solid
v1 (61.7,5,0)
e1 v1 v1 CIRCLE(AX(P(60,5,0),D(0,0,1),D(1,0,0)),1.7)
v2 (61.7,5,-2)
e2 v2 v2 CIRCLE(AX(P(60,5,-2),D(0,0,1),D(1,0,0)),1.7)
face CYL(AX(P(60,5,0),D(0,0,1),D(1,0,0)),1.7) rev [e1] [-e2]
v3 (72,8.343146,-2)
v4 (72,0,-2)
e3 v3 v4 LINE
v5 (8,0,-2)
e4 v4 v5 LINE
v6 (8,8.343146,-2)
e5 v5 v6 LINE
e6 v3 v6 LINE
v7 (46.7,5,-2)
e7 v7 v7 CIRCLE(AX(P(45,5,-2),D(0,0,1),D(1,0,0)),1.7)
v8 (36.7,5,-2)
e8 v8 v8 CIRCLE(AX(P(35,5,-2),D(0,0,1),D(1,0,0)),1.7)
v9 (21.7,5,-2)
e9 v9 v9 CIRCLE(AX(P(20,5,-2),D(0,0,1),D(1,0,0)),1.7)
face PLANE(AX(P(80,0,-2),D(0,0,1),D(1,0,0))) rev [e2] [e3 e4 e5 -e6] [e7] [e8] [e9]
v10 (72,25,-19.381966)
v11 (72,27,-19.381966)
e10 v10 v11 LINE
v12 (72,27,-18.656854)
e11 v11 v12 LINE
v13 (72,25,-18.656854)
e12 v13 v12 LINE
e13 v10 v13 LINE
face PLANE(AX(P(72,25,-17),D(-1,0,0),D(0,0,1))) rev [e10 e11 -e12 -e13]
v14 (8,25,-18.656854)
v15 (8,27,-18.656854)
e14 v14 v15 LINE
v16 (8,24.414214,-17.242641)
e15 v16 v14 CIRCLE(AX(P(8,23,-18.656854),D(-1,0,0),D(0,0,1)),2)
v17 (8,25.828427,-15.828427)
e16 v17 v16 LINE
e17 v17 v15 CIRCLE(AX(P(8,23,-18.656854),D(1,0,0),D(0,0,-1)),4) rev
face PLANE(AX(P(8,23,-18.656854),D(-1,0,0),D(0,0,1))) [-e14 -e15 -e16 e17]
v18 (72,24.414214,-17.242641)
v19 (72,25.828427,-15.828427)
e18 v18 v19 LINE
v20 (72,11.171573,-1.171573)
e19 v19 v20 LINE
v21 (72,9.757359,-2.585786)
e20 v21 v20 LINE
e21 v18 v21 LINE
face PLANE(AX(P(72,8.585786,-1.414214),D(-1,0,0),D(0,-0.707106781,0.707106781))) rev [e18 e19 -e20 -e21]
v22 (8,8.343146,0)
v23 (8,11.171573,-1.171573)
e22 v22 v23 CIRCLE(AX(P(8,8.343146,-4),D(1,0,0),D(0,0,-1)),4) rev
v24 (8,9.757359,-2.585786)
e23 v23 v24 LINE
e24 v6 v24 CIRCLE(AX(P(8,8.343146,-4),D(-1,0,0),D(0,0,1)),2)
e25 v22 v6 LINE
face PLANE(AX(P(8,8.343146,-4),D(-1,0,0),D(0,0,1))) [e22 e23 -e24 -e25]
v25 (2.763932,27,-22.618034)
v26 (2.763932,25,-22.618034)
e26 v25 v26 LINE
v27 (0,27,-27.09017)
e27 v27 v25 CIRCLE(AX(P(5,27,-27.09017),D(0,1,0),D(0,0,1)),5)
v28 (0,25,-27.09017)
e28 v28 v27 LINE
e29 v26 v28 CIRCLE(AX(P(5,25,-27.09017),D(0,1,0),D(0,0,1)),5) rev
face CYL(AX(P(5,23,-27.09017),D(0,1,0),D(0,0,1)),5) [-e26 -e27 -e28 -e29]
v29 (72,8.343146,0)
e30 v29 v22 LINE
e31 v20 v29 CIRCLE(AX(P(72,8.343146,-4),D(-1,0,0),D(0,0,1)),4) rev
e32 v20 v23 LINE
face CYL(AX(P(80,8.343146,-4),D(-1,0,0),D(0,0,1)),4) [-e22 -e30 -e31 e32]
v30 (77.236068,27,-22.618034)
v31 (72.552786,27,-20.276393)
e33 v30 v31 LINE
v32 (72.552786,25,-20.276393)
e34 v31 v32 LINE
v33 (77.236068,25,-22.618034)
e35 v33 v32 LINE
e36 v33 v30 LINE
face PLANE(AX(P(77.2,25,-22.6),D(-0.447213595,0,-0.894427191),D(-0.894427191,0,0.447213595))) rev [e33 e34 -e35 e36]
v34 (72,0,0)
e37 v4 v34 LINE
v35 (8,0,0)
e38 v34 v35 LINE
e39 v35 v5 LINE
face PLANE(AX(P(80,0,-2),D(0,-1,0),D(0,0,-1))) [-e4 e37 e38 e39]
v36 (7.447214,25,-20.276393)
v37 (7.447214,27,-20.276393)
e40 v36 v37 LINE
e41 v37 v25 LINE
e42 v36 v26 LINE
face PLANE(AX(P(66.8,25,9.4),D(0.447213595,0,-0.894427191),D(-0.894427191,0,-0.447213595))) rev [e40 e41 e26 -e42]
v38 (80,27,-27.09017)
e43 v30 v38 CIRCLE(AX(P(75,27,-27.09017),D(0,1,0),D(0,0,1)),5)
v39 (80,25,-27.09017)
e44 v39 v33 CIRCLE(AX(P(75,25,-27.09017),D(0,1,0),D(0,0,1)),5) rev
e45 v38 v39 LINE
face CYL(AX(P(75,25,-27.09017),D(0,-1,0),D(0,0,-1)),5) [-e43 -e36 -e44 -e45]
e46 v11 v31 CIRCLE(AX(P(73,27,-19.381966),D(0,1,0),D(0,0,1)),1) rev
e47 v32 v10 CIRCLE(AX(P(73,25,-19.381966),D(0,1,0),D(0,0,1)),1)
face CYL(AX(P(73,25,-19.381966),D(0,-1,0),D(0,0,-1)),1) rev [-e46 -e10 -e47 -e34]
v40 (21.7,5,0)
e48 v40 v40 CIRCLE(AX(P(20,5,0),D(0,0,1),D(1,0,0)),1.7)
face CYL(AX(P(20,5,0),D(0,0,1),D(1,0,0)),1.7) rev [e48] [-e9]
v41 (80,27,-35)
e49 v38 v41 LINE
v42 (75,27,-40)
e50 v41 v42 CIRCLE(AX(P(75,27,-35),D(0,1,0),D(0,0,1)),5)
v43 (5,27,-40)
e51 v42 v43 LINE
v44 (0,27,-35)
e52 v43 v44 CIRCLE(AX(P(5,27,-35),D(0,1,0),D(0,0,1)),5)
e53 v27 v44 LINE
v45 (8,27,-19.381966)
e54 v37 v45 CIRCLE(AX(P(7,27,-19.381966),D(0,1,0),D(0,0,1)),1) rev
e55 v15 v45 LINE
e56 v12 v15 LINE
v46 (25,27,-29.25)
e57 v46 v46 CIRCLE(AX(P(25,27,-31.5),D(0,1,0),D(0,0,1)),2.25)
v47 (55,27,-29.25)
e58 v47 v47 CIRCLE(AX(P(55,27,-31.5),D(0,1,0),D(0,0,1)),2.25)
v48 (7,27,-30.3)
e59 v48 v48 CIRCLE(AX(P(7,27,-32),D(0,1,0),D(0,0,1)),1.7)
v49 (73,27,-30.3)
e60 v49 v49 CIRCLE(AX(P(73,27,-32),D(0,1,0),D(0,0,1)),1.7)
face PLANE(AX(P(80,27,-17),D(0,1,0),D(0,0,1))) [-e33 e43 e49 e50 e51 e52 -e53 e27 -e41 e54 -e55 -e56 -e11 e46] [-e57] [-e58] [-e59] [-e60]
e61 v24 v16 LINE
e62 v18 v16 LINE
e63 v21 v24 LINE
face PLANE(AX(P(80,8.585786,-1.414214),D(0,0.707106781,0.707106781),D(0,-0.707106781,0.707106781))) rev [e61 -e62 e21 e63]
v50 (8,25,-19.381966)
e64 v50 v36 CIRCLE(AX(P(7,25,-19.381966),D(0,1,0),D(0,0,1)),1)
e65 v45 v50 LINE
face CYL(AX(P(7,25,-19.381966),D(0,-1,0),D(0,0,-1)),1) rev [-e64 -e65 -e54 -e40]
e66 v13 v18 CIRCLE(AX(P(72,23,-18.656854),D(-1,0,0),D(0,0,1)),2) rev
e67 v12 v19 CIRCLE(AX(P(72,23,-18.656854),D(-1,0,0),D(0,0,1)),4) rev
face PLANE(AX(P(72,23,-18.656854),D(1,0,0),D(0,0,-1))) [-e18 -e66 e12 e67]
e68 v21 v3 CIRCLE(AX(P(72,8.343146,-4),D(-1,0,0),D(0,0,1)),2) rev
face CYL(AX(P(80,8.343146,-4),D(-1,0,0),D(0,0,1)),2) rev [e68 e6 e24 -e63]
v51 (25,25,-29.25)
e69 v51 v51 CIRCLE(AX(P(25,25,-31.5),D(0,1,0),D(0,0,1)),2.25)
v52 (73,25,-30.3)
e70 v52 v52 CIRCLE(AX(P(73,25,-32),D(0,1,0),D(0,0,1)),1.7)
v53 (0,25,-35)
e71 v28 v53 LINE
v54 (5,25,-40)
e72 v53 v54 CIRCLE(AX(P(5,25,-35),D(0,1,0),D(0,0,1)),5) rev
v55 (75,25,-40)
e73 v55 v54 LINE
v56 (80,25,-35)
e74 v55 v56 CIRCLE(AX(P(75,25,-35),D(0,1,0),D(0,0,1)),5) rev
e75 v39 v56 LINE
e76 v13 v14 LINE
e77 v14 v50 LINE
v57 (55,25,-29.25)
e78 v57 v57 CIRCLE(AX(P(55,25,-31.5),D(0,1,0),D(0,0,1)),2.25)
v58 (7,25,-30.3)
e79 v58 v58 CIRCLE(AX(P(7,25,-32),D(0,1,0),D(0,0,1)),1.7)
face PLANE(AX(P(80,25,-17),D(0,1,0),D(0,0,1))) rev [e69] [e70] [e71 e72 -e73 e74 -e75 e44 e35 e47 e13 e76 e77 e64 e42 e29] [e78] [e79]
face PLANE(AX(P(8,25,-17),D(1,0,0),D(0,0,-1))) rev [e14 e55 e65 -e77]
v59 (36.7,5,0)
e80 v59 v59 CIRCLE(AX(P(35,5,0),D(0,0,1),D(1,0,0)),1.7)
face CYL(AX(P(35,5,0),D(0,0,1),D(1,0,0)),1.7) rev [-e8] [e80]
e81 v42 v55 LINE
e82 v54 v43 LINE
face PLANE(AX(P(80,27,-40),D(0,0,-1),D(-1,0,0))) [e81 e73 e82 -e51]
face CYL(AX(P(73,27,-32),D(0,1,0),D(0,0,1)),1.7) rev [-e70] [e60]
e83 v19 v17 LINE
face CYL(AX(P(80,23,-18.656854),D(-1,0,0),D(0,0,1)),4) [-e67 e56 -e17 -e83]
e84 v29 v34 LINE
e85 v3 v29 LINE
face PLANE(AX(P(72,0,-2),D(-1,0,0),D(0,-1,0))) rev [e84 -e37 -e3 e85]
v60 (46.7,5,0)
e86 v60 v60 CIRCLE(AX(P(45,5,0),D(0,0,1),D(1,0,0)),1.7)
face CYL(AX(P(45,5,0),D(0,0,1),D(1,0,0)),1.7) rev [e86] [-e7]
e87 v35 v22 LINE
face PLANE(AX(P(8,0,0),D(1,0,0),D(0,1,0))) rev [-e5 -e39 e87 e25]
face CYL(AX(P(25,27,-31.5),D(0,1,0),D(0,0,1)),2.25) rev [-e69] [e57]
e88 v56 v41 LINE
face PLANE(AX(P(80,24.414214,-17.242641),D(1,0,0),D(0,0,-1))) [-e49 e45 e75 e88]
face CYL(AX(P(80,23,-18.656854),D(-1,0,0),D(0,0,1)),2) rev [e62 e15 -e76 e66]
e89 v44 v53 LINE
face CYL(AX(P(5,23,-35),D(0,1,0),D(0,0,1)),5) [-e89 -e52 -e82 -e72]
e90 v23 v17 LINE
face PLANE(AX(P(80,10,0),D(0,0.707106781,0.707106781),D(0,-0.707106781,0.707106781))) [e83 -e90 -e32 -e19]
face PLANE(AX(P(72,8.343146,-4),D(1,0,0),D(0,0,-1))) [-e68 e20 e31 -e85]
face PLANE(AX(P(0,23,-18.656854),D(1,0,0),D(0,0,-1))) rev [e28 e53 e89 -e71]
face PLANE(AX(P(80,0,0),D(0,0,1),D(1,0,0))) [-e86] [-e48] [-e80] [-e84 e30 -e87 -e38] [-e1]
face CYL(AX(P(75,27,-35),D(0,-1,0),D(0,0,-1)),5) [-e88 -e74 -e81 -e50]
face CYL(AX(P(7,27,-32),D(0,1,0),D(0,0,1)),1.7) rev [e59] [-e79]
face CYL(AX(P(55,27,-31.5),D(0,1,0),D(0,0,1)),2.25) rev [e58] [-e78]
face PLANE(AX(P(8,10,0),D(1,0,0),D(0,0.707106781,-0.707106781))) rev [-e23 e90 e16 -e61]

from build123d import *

# Parameters (mm, degrees)
BASE_FLANGE1_DEPTH       = 80
CUT_EXTRUDE1_DEPTH       = 94.429117517
M3_CLEARANCE_HOLE1_D     = 3.4
M3_CLEARANCE_HOLE1_DEPTH = 2
M3_CLEARANCE_HOLE1_TIP   = 1.021463052
M4_CLEARANCE_HOLE1_D     = 4.5
M4_CLEARANCE_HOLE1_DEPTH = 2
M4_CLEARANCE_HOLE1_TIP   = 1.351936393
M3_CLEARANCE_HOLE2_D     = 3.4
M3_CLEARANCE_HOLE2_DEPTH = 2
M3_CLEARANCE_HOLE2_TIP   = 1.021463052
FILLET1_R                = 5
FILLET2_R                = 1


# Sheet-metal steps are written as plain solids
with BuildPart() as part:
    # Sketch1 → Base-Flange1 (new body)
    with BuildSketch(Plane(origin=(0, 0, 0), x_dir=(0, 0, -1), z_dir=(1, 0, 0))):
        with BuildLine():
            Line((0, 0), (0, 8.343145751))
            ThreePointArc((0, 8.343145751), (0.30448187, 9.87387948), (1.171572875, 11.171572875))
            Line((1.171572875, 11.171572875), (15.828427125, 25.828427125))
            ThreePointArc((15.828427125, 25.828427125), (17.12612052, 26.69551813), (18.656854249, 27))
            Line((18.656854249, 27), (40, 27))
            Line((40, 27), (40, 25))
            Line((40, 25), (18.656854249, 25))
            ThreePointArc((18.656854249, 25), (17.891487385, 24.847759065), (17.242640687, 24.414213562))
            Line((17.242640687, 24.414213562), (2.585786438, 9.757359313))
            ThreePointArc((2.585786438, 9.757359313), (2.152240935, 9.108512615), (2, 8.343145751))
            Line((2, 8.343145751), (2, 0))
            Line((2, 0), (0, 0))
        make_face()
    extrude(amount=BASE_FLANGE1_DEPTH)

    # Sketch2 → Cut-Extrude1 (cut, through all)
    with BuildSketch(Plane(origin=(0, 27, 0), x_dir=(1, 0, 0), z_dir=(0, 1, 0))):
        Polygon((0, 24), (8, 20), (8, 0), (0, 0), align=None)
        Polygon((80, 0), (80, 24), (72, 20), (72, 0), align=None)
    extrude(amount=-CUT_EXTRUDE1_DEPTH, mode=Mode.SUBTRACT)

    # M3 Clearance Hole1
    with Locations(Plane.XY):
        with Locations((20, 5), (35, 5), (45, 5), (60, 5)):
            Hole(M3_CLEARANCE_HOLE1_D / 2, depth=M3_CLEARANCE_HOLE1_DEPTH)
            with Locations((0, 0, -(M3_CLEARANCE_HOLE1_DEPTH + M3_CLEARANCE_HOLE1_TIP / 2))):  # 118° drill point
                Cone(0, M3_CLEARANCE_HOLE1_D / 2, M3_CLEARANCE_HOLE1_TIP, mode=Mode.SUBTRACT)

    # M4 Clearance Hole1
    with Locations(Plane(origin=(0, 27, 0), x_dir=(1, 0, 0), z_dir=(0, 1, 0))):
        with Locations((25, 31.5), (55, 31.5)):
            Hole(M4_CLEARANCE_HOLE1_D / 2, depth=M4_CLEARANCE_HOLE1_DEPTH)
            with Locations((0, 0, -(M4_CLEARANCE_HOLE1_DEPTH + M4_CLEARANCE_HOLE1_TIP / 2))):  # 118° drill point
                Cone(0, M4_CLEARANCE_HOLE1_D / 2, M4_CLEARANCE_HOLE1_TIP, mode=Mode.SUBTRACT)

    # M3 Clearance Hole2
    with Locations(Plane(origin=(0, 27, 0), x_dir=(1, 0, 0), z_dir=(0, 1, 0))):
        with Locations((7, 32), (73, 32)):
            Hole(M3_CLEARANCE_HOLE2_D / 2, depth=M3_CLEARANCE_HOLE2_DEPTH)
            with Locations((0, 0, -(M3_CLEARANCE_HOLE2_DEPTH + M3_CLEARANCE_HOLE2_TIP / 2))):  # 118° drill point
                Cone(0, M3_CLEARANCE_HOLE2_D / 2, M3_CLEARANCE_HOLE2_TIP, mode=Mode.SUBTRACT)

    # Fillet1
    fillet1_edges = [part.edges().sort_by_distance(p)[0] for p in [
        (0, 26, -40),
        (80, 26, -24),
        (80, 26, -40),
        (0, 26, -24),
    ]]
    fillet(fillet1_edges, radius=FILLET1_R)

    # Fillet2
    fillet2_edges = [part.edges().sort_by_distance(p)[0] for p in [
        (72, 26, -20),
        (8, 26, -20),
    ]]
    fillet(fillet2_edges, radius=FILLET2_R)


solid = part.part
